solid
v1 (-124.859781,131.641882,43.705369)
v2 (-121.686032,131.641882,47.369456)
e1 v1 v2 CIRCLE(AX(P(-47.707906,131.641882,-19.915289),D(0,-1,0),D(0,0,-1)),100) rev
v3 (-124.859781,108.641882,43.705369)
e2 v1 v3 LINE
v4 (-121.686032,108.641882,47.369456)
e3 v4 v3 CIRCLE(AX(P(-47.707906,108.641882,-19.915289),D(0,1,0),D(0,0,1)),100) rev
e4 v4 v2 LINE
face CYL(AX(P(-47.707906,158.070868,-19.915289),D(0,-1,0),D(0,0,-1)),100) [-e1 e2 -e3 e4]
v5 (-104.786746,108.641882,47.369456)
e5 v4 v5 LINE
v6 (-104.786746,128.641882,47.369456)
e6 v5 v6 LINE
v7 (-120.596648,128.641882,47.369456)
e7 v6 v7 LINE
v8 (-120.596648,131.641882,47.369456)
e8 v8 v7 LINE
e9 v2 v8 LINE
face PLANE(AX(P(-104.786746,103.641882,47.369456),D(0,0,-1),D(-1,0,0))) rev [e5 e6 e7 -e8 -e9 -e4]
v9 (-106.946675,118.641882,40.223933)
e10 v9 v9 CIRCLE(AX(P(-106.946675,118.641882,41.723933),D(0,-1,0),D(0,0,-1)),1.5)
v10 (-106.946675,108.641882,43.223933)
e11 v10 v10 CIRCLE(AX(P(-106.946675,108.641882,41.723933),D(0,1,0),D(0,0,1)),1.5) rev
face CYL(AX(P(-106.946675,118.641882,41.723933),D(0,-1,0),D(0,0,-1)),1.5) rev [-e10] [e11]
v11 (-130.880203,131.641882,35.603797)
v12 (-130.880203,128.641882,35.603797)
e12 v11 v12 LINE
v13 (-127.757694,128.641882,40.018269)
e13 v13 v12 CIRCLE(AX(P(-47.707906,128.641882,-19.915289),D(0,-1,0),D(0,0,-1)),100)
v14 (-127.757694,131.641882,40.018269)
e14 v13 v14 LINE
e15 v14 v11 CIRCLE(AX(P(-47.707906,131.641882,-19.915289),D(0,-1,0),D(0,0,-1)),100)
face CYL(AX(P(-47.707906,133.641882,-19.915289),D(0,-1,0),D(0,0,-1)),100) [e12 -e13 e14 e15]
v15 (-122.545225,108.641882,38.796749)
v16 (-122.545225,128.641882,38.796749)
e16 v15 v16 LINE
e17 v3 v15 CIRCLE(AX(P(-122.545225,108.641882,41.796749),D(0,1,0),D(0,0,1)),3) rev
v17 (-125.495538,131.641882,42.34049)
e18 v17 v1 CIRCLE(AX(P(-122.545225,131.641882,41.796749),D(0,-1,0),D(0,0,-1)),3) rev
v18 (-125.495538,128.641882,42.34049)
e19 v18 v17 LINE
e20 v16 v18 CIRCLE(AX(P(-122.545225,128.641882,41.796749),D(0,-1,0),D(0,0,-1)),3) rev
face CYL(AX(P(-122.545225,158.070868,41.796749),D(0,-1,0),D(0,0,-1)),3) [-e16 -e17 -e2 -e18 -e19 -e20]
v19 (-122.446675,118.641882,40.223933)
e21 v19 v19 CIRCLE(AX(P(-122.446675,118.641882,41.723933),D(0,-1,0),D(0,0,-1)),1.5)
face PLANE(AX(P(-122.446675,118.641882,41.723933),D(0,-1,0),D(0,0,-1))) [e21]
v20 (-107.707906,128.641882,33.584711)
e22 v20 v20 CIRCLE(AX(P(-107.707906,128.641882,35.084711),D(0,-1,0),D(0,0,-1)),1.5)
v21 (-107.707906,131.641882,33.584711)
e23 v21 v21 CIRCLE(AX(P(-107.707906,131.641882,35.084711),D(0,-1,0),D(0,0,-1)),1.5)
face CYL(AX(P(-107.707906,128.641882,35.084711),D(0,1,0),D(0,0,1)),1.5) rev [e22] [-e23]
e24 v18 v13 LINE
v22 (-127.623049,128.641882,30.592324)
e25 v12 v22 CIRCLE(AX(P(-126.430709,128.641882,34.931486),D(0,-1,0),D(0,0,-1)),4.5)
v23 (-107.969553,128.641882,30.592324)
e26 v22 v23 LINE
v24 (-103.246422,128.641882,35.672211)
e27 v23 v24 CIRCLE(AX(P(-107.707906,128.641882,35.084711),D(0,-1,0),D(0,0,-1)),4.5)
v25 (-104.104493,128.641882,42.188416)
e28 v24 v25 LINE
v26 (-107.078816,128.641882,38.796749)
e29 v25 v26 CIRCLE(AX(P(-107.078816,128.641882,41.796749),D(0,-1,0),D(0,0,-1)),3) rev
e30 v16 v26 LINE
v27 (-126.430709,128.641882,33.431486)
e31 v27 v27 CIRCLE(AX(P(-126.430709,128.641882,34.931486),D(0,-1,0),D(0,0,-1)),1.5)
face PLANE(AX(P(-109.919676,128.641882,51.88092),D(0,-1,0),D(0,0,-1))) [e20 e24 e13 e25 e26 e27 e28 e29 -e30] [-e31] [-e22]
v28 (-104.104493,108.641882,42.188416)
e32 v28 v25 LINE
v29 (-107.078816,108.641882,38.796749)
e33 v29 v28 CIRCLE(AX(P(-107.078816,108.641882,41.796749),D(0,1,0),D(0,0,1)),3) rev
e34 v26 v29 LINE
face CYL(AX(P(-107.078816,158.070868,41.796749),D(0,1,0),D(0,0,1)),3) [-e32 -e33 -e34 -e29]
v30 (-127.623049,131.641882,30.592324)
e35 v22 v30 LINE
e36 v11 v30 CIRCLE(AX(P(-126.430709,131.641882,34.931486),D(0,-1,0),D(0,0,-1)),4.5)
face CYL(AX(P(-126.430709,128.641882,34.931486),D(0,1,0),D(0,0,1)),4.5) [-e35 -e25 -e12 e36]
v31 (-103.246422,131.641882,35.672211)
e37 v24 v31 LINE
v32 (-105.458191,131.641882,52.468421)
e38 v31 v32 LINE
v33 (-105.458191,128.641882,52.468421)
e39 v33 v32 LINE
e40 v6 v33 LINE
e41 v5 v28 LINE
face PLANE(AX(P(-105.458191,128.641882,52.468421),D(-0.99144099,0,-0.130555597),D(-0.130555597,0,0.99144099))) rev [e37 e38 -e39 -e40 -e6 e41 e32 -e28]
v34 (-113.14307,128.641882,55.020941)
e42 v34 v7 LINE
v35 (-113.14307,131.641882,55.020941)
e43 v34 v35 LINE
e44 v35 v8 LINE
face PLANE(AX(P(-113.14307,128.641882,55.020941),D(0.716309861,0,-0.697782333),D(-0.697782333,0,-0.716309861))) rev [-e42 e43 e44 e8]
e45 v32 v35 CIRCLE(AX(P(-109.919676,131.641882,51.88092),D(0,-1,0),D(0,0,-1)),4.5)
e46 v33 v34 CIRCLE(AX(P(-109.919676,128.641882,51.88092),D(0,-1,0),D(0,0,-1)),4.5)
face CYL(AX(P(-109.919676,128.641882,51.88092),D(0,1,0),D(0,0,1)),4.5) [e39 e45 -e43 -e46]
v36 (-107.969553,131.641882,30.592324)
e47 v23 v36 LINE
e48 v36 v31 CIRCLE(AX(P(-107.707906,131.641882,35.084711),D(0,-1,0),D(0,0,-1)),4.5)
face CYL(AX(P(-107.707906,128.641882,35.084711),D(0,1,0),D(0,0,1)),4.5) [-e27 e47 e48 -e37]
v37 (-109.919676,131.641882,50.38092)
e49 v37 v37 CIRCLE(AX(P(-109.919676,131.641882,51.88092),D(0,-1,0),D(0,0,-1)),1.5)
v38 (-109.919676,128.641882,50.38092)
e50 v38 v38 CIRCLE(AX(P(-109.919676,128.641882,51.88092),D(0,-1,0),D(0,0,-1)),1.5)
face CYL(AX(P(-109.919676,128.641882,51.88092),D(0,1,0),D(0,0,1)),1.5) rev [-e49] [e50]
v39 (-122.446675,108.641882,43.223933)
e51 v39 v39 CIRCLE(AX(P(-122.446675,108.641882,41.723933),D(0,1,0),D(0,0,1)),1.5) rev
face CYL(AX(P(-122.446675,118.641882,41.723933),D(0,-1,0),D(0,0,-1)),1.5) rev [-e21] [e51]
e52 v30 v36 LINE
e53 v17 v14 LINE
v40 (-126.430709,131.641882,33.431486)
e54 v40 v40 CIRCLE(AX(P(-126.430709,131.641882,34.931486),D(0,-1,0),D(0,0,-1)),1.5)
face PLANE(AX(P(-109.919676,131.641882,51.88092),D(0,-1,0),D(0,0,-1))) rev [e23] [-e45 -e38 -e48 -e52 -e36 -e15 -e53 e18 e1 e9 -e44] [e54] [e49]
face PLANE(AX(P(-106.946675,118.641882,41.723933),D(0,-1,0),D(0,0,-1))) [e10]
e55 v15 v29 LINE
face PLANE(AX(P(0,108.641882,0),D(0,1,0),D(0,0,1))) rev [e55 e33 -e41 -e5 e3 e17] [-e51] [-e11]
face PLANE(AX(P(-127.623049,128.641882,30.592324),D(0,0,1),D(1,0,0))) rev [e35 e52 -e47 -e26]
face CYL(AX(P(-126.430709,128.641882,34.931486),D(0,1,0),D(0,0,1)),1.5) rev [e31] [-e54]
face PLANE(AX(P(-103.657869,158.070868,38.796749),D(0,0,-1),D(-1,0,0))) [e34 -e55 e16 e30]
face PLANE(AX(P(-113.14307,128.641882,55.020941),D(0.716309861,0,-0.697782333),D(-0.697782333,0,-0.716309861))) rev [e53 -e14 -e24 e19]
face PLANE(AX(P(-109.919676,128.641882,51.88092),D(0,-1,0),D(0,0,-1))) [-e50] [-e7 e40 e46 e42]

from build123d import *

# Parameters (mm, degrees)
EXTRUDE_1_OUTLINE_R = 1.5
EXTRUDE_1_DEPTH     = 3
EXTRUDE_2_DEPTH     = 25
EXTRUDE_3_DEPTH     = 3
EXTRUDE_4_REACH     = 147.278
FILLET_1_R          = 3
SKETCH_5_R          = 1.5
CUT_EXTRUDE_3_DEPTH = 15
SKETCH_6_R          = 126.976740186
SKETCH_6_R_2        = 100
CUT_EXTRUDE_4_DEPTH = 30
SKETCH_8_W          = 28.33895888
SKETCH_8_H          = 14.242713356
CUT_EXTRUDE_5_DEPTH = 5


# Read off the part's stored shape, not the designer's step: 填料-伸長1
with BuildPart() as part:
    # 填料-伸長1 outline → 填料-伸長1 (new body)
    with BuildSketch(Plane.XZ.offset(-131.641882403)):
        with BuildLine():
            ThreePointArc((-105.458191259, 52.468420543), (-108.501205852, 56.151510861), (-113.143070085, 55.020940854))
            Line((-113.143070085, 55.020940854), (-129.654103506, 38.071506203))
            ThreePointArc((-129.654103506, 38.071506203), (-130.77342938, 33.752171981), (-127.62304878, 30.592323786))
            Line((-127.62304878, 30.592323786), (-107.96955265, 30.592323786))
            ThreePointArc((-107.96955265, 30.592323786), (-104.412306977, 32.020558846), (-103.246421534, 35.67221098))
            Line((-103.246421534, 35.67221098), (-105.458191259, 52.468420543))
        make_face()
        with Locations((-126.430709133, 34.931485706)):
            Circle(EXTRUDE_1_OUTLINE_R, mode=Mode.SUBTRACT)
        with Locations((-107.707905988, 35.084710794)):
            Circle(EXTRUDE_1_OUTLINE_R, mode=Mode.SUBTRACT)
        with Locations((-109.919675712, 51.880920357)):
            Circle(EXTRUDE_1_OUTLINE_R, mode=Mode.SUBTRACT)
    extrude(amount=EXTRUDE_1_DEPTH)

    # 草圖2 → 填料-伸長2 (add)
    with BuildSketch(Plane.XZ.offset(-128.641882403)):
        Polygon((-104.786745972, 47.369455849), (-124.786745972, 47.369455849), (-124.786745972, 44.369455849), (-104.786745972, 44.369455849), (-104.391697962, 44.369455849), align=None)
    extrude(amount=EXTRUDE_2_DEPTH)

    # 草圖3 → 填料-伸長3 (add)
    with BuildSketch(Plane(origin=(0, 128.641882403, 0), x_dir=(1, 0, 0), z_dir=(0, 1, 0))):
        Polygon((-124.786745972, -47.369455849), (-120.596647578, -47.369455849), (-123.519051852, -44.369455849), (-124.786745972, -44.369455849), align=None)
    extrude(amount=EXTRUDE_3_DEPTH)

    # 填料-伸長4: up to this face of the body (flat: up to its plane)
    extrude_4_end = Plane(part.part.faces().sort_by_distance((-115.187288505, 131.641882403, 40.896845269))[0])
    # 草圖4 → 填料-伸長4 (add, up to the picked face)
    with BuildSketch(Plane.XZ.offset(-103.641882403), mode=Mode.PRIVATE) as extrude_4_sk1:
        with BuildLine():
            Line((-104.786745972, 47.369455849), (-103.657869092, 38.796749367))
            Line((-103.657869092, 38.796749367), (-128.657869092, 38.796749367))
            ThreePointArc((-128.657869092, 38.796749367), (-125.290449125, 43.179472861), (-121.686031693, 47.369455849))
            Line((-121.686031693, 47.369455849), (-104.786745972, 47.369455849))
        make_face()
    extrude_4_tool1 = split(extrude(extrude_4_sk1.sketch, amount=-EXTRUDE_4_REACH, mode=Mode.PRIVATE), bisect_by=extrude_4_end, keep=Keep.BOTH, mode=Mode.PRIVATE)
    add(extrude_4_tool1.solids().sort_by(Axis((-114.856202, 103.641882, 42.808825), (0, 1, 0)))[0])

    # 圓角1
    # the kernel refuses this fillet: 3 mm, written as the material it takes off along each edge
    with BuildSketch(Plane(origin=(-128.657869092, 88.125757689, 38.796749367), x_dir=(1, 0, 0), z_dir=(0, 1, 0))) as fillet_1_piece_1:
        with BuildLine():
            CenterArc((6.112644238, -3), FILLET_1_R, 90, 129.509532044)
            ThreePointArc((3.798087984, -4.90861975), (1.860953441, -2.483782776), (0, 0))
            Line((0, 0), (6.112644238, 0))
        make_face()
    extrude(amount=40.516124714, mode=Mode.SUBTRACT)
    with BuildSketch(Plane(origin=(-128.657869092, 88.125757689, 38.796749367), x_dir=(1, 0, 0), z_dir=(0, 1, 0))) as fillet_1_piece_2_section:
        with BuildLine():
            CenterArc((6.112644238, -3), FILLET_1_R, 90, 129.509532044)
            ThreePointArc((3.798087984, -4.90861975), (1.860953441, -2.483782776), (0, 0))
            Line((0, 0), (6.112644238, 0))
        make_face()
    fillet_1_piece_2 = extrude(amount=56.032249428, mode=Mode.PRIVATE)
    fillet_1_piece_2 = split(fillet_1_piece_2, bisect_by=Plane(origin=(-126.052723455, 130.141882403, 41.768510156), z_dir=(-0.7163098605374205, 0, 0.6977823326058501)), keep=Keep.TOP, mode=Mode.PRIVATE)
    add(fillet_1_piece_2, mode=Mode.SUBTRACT)
    with BuildSketch(Plane(origin=(-103.657869092, 95.089515631, 38.796749367), x_dir=(-0.13055559688671156, 0, 0.9914409897323968), z_dir=(0, 1, 0))) as fillet_1_piece_3:
        with BuildLine():
            CenterArc((FILLET_1_R * 1.14031556955, -FILLET_1_R), FILLET_1_R, 90, 97.501699304)
            Line((FILLET_1_R * 0.148874579822, -FILLET_1_R * 1.13055559689), (0, 0))
            Line((0, 0), (FILLET_1_R * 1.14031556955, 0))
        make_face()
    extrude(amount=33.552366772, mode=Mode.SUBTRACT)

    # 草圖5 → 除料-伸長3 (cut)
    with BuildSketch(Plane.XZ.offset(-103.641882403)):
        with Locations(Location((-106.94667544, 41.72393279, 0), (0, 0, 270))):
            Circle(SKETCH_5_R)
        with Locations(Location((-122.44667544, 41.72393279, 0), (0, 0, 270))):
            Circle(SKETCH_5_R)
    extrude(amount=-CUT_EXTRUDE_3_DEPTH, mode=Mode.SUBTRACT)

    # 草圖6 → 除料-伸長4 (cut)
    with BuildSketch(Plane.XZ.offset(-103.641882403)):
        with Locations((-47.707905988, -19.915289206)):
            Circle(SKETCH_6_R)
        with Locations((-47.707905988, -19.915289206)):
            Circle(SKETCH_6_R_2, mode=Mode.SUBTRACT)
    extrude(amount=-CUT_EXTRUDE_4_DEPTH, mode=Mode.SUBTRACT)

    # 草圖8 → 除料-伸長5 (cut)
    with BuildSketch(Plane.XZ.offset(-103.641882403)):
        with Locations((-114.972608674, 43.454782353)):
            Rectangle(SKETCH_8_W, SKETCH_8_H)
    extrude(amount=-CUT_EXTRUDE_5_DEPTH, mode=Mode.SUBTRACT)


solid = part.part
